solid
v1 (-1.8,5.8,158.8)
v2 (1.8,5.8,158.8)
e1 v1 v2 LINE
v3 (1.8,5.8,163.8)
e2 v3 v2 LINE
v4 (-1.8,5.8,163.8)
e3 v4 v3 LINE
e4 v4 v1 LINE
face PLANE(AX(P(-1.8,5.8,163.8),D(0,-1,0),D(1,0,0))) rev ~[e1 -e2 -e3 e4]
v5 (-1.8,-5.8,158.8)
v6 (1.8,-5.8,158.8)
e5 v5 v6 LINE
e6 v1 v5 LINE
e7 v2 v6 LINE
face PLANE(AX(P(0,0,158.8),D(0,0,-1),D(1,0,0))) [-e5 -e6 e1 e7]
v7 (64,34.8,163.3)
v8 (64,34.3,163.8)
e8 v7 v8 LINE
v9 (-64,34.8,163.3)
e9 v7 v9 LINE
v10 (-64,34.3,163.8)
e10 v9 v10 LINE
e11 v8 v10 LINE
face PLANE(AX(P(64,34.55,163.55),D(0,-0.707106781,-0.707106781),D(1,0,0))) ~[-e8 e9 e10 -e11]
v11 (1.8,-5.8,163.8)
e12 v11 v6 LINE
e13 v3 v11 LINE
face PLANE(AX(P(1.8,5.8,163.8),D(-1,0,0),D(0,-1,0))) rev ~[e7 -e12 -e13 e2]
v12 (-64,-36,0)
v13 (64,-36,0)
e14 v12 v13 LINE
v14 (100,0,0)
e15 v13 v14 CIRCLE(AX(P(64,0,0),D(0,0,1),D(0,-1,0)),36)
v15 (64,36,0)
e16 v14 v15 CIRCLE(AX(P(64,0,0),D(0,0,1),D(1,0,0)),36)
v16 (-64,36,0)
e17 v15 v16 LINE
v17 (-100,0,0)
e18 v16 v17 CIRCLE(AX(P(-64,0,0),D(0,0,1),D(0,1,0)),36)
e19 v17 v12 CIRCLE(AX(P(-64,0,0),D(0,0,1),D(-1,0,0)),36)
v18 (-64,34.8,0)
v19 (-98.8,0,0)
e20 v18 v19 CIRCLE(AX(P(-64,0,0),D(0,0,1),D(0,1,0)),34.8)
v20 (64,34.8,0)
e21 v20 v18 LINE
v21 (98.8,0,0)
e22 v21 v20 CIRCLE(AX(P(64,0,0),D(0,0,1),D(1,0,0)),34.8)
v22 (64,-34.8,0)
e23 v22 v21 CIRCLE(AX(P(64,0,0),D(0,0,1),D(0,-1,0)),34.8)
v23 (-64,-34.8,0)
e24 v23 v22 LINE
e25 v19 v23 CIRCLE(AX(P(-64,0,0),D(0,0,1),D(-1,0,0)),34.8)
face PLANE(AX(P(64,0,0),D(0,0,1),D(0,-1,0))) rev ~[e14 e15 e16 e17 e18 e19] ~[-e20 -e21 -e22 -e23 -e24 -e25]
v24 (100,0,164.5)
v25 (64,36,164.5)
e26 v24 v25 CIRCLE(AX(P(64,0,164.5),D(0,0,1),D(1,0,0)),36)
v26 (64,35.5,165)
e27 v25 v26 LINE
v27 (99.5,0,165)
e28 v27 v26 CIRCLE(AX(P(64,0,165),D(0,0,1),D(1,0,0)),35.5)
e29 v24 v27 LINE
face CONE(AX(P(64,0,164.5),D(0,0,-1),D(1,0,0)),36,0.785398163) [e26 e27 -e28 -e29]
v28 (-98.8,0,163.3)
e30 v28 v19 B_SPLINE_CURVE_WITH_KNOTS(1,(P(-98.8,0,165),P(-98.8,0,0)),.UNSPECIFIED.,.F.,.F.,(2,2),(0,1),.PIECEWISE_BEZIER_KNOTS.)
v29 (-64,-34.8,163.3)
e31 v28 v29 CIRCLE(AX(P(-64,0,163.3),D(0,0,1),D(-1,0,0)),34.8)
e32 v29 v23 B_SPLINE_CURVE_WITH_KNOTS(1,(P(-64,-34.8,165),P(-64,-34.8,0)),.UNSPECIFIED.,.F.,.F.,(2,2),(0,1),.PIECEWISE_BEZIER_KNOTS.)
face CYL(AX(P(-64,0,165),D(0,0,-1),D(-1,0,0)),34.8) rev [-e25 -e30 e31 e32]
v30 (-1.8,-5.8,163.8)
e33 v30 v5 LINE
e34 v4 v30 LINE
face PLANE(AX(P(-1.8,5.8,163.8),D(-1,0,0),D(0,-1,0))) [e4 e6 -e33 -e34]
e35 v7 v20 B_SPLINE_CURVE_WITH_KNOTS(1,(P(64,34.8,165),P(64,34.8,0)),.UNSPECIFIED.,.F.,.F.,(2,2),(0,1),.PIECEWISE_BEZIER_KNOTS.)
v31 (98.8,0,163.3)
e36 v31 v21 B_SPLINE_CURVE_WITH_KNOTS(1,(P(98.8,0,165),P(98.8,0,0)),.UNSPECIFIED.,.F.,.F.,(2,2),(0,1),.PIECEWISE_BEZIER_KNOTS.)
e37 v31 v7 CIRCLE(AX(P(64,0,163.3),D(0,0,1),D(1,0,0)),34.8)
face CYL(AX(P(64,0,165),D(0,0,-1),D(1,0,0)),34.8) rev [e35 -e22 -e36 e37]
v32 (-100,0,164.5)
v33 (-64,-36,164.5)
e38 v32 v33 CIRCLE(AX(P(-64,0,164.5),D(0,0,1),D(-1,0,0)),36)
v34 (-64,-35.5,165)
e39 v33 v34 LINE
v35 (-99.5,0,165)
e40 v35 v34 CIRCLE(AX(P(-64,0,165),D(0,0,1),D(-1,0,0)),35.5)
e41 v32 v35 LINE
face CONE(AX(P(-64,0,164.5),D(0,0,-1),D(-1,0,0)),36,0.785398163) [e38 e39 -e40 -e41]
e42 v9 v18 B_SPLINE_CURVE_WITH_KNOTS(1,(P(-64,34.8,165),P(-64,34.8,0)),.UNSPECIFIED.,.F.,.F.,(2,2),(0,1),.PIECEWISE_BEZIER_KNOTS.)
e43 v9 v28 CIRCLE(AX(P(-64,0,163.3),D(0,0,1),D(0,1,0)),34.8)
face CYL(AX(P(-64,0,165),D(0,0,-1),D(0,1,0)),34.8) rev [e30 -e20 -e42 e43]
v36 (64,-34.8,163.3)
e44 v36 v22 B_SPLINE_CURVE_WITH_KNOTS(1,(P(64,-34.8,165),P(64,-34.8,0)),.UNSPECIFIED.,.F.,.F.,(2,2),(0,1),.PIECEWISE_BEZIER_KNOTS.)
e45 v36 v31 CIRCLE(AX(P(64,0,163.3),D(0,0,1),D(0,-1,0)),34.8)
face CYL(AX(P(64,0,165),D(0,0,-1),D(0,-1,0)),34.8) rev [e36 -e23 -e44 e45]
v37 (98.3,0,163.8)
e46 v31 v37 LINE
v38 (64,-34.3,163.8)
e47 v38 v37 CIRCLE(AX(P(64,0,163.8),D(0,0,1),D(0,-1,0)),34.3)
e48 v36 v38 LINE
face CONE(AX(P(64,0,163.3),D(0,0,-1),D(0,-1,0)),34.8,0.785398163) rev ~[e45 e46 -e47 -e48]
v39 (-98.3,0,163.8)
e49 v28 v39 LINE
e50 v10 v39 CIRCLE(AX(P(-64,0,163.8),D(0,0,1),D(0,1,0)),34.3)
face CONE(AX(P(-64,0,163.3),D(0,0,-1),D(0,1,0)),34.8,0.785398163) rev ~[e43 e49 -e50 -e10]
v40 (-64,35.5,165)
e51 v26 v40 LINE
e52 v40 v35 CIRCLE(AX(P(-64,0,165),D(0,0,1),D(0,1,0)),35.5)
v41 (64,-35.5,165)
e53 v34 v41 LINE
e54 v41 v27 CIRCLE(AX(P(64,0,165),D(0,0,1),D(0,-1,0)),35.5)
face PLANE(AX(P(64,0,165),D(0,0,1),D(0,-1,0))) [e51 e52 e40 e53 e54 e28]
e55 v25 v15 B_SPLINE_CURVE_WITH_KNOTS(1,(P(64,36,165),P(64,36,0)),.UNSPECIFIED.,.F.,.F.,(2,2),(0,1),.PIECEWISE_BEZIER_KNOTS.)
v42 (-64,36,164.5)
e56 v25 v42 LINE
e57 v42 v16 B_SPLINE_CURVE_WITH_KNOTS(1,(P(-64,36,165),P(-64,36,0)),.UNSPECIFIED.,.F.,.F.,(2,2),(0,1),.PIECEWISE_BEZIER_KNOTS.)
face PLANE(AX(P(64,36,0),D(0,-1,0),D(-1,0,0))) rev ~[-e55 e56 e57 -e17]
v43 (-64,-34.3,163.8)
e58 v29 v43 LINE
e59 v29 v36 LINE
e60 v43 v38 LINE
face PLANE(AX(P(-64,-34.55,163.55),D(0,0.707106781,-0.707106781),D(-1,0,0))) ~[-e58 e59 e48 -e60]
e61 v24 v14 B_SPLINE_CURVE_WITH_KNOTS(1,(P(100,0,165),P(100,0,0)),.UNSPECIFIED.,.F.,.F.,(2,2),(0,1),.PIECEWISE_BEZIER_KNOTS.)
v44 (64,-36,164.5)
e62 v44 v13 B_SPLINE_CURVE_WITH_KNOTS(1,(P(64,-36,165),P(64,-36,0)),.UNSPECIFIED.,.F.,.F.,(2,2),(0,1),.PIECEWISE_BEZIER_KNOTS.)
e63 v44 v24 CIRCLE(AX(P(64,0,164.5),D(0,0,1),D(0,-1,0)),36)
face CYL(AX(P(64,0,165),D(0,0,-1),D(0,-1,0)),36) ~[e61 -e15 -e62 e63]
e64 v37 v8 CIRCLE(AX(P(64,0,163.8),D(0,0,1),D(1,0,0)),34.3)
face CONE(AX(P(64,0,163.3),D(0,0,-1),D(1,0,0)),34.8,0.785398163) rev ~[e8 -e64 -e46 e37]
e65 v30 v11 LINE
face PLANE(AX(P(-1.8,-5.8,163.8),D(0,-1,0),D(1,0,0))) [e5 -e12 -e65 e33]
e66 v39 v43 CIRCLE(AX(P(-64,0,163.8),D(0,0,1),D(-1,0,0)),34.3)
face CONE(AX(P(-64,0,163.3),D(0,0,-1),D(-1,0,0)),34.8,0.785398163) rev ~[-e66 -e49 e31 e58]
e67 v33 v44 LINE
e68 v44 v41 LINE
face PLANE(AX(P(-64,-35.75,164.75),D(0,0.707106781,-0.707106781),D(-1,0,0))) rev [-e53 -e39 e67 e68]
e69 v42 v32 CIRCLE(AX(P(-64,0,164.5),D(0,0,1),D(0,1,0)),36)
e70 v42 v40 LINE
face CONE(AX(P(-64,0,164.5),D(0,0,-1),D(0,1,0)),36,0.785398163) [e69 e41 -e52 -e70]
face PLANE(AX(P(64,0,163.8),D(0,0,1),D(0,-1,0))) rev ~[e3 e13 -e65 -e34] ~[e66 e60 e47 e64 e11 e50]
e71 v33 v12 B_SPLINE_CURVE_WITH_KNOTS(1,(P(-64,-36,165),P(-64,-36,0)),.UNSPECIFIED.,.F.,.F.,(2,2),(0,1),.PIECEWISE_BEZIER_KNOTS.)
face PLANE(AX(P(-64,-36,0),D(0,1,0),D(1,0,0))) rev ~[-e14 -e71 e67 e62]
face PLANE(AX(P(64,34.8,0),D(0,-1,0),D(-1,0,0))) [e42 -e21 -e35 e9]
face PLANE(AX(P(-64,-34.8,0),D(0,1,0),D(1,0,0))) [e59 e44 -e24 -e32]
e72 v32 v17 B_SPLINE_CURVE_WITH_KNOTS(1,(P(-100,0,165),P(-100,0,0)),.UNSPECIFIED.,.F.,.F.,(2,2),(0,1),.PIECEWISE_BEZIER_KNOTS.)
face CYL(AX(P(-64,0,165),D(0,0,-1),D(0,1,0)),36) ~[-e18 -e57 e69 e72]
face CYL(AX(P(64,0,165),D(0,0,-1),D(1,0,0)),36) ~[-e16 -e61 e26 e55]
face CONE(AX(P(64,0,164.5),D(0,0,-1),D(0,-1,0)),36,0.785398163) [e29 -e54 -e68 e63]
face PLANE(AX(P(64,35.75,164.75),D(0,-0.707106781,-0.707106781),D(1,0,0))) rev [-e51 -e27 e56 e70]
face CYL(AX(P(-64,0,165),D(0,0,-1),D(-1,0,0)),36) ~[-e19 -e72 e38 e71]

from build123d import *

# Parameters (mm, degrees)
F4_T     = -1.2
F5_SIZE  = 0.5
F6_W     = 3.6
F6_H     = 11.6
F7_DEPTH = 5


with BuildPart() as f3:
    # F2 (on offset) → F3 section 0
    with BuildSketch(Plane.XY.offset(165)):
        with BuildLine():
            Line((-64, -36), (64, -36))
            ThreePointArc((64, -36), (89.4558441227, -25.4558441227), (100, 0))
            ThreePointArc((100, 0), (89.4558441227, 25.4558441227), (64, 36))
            Line((64, 36), (-64, 36))
            ThreePointArc((-64, 36), (-89.4558441227, 25.4558441227), (-100, 0))
            ThreePointArc((-100, 0), (-89.4558441227, -25.4558441227), (-64, -36))
        make_face()
    # F0 (on Top) → F3 section 1
    with BuildSketch(Plane.XY):
        with BuildLine():
            Line((-64, -36), (64, -36))
            ThreePointArc((64, -36), (89.4558441227, -25.4558441227), (100, 0))
            ThreePointArc((100, 0), (89.4558441227, 25.4558441227), (64, 36))
            Line((64, 36), (-64, 36))
            ThreePointArc((-64, 36), (-89.4558441227, 25.4558441227), (-100, 0))
            ThreePointArc((-100, 0), (-89.4558441227, -25.4558441227), (-64, -36))
        make_face()
    loft()

    # F4
    f4_openings = [f3.faces().sort_by_distance(p)[0] for p in [
        (0, 0, 0),
    ]]
    offset(amount=F4_T, openings=f4_openings)

    # F5
    f5_edges = [f3.edges().sort_by_distance(p)[0] for p in [
        (-100, 0, 165),
        (0, 36, 165),
        (100, 0, 165),
        (0, -36, 165),
        (-98.8, 0, 163.8),
        (0, -34.8, 163.8),
        (98.8, 0, 163.8),
        (0, 34.8, 163.8),
    ]]
    chamfer(f5_edges, length=F5_SIZE)

    # F6 (on face) → F7 (join)
    with BuildSketch(Plane(origin=(0, 0, 163.8), x_dir=(1, 0, 0), z_dir=(0, 0, -1))):
        Rectangle(F6_W, F6_H)
    extrude(amount=F7_DEPTH)


solid = f3.part
